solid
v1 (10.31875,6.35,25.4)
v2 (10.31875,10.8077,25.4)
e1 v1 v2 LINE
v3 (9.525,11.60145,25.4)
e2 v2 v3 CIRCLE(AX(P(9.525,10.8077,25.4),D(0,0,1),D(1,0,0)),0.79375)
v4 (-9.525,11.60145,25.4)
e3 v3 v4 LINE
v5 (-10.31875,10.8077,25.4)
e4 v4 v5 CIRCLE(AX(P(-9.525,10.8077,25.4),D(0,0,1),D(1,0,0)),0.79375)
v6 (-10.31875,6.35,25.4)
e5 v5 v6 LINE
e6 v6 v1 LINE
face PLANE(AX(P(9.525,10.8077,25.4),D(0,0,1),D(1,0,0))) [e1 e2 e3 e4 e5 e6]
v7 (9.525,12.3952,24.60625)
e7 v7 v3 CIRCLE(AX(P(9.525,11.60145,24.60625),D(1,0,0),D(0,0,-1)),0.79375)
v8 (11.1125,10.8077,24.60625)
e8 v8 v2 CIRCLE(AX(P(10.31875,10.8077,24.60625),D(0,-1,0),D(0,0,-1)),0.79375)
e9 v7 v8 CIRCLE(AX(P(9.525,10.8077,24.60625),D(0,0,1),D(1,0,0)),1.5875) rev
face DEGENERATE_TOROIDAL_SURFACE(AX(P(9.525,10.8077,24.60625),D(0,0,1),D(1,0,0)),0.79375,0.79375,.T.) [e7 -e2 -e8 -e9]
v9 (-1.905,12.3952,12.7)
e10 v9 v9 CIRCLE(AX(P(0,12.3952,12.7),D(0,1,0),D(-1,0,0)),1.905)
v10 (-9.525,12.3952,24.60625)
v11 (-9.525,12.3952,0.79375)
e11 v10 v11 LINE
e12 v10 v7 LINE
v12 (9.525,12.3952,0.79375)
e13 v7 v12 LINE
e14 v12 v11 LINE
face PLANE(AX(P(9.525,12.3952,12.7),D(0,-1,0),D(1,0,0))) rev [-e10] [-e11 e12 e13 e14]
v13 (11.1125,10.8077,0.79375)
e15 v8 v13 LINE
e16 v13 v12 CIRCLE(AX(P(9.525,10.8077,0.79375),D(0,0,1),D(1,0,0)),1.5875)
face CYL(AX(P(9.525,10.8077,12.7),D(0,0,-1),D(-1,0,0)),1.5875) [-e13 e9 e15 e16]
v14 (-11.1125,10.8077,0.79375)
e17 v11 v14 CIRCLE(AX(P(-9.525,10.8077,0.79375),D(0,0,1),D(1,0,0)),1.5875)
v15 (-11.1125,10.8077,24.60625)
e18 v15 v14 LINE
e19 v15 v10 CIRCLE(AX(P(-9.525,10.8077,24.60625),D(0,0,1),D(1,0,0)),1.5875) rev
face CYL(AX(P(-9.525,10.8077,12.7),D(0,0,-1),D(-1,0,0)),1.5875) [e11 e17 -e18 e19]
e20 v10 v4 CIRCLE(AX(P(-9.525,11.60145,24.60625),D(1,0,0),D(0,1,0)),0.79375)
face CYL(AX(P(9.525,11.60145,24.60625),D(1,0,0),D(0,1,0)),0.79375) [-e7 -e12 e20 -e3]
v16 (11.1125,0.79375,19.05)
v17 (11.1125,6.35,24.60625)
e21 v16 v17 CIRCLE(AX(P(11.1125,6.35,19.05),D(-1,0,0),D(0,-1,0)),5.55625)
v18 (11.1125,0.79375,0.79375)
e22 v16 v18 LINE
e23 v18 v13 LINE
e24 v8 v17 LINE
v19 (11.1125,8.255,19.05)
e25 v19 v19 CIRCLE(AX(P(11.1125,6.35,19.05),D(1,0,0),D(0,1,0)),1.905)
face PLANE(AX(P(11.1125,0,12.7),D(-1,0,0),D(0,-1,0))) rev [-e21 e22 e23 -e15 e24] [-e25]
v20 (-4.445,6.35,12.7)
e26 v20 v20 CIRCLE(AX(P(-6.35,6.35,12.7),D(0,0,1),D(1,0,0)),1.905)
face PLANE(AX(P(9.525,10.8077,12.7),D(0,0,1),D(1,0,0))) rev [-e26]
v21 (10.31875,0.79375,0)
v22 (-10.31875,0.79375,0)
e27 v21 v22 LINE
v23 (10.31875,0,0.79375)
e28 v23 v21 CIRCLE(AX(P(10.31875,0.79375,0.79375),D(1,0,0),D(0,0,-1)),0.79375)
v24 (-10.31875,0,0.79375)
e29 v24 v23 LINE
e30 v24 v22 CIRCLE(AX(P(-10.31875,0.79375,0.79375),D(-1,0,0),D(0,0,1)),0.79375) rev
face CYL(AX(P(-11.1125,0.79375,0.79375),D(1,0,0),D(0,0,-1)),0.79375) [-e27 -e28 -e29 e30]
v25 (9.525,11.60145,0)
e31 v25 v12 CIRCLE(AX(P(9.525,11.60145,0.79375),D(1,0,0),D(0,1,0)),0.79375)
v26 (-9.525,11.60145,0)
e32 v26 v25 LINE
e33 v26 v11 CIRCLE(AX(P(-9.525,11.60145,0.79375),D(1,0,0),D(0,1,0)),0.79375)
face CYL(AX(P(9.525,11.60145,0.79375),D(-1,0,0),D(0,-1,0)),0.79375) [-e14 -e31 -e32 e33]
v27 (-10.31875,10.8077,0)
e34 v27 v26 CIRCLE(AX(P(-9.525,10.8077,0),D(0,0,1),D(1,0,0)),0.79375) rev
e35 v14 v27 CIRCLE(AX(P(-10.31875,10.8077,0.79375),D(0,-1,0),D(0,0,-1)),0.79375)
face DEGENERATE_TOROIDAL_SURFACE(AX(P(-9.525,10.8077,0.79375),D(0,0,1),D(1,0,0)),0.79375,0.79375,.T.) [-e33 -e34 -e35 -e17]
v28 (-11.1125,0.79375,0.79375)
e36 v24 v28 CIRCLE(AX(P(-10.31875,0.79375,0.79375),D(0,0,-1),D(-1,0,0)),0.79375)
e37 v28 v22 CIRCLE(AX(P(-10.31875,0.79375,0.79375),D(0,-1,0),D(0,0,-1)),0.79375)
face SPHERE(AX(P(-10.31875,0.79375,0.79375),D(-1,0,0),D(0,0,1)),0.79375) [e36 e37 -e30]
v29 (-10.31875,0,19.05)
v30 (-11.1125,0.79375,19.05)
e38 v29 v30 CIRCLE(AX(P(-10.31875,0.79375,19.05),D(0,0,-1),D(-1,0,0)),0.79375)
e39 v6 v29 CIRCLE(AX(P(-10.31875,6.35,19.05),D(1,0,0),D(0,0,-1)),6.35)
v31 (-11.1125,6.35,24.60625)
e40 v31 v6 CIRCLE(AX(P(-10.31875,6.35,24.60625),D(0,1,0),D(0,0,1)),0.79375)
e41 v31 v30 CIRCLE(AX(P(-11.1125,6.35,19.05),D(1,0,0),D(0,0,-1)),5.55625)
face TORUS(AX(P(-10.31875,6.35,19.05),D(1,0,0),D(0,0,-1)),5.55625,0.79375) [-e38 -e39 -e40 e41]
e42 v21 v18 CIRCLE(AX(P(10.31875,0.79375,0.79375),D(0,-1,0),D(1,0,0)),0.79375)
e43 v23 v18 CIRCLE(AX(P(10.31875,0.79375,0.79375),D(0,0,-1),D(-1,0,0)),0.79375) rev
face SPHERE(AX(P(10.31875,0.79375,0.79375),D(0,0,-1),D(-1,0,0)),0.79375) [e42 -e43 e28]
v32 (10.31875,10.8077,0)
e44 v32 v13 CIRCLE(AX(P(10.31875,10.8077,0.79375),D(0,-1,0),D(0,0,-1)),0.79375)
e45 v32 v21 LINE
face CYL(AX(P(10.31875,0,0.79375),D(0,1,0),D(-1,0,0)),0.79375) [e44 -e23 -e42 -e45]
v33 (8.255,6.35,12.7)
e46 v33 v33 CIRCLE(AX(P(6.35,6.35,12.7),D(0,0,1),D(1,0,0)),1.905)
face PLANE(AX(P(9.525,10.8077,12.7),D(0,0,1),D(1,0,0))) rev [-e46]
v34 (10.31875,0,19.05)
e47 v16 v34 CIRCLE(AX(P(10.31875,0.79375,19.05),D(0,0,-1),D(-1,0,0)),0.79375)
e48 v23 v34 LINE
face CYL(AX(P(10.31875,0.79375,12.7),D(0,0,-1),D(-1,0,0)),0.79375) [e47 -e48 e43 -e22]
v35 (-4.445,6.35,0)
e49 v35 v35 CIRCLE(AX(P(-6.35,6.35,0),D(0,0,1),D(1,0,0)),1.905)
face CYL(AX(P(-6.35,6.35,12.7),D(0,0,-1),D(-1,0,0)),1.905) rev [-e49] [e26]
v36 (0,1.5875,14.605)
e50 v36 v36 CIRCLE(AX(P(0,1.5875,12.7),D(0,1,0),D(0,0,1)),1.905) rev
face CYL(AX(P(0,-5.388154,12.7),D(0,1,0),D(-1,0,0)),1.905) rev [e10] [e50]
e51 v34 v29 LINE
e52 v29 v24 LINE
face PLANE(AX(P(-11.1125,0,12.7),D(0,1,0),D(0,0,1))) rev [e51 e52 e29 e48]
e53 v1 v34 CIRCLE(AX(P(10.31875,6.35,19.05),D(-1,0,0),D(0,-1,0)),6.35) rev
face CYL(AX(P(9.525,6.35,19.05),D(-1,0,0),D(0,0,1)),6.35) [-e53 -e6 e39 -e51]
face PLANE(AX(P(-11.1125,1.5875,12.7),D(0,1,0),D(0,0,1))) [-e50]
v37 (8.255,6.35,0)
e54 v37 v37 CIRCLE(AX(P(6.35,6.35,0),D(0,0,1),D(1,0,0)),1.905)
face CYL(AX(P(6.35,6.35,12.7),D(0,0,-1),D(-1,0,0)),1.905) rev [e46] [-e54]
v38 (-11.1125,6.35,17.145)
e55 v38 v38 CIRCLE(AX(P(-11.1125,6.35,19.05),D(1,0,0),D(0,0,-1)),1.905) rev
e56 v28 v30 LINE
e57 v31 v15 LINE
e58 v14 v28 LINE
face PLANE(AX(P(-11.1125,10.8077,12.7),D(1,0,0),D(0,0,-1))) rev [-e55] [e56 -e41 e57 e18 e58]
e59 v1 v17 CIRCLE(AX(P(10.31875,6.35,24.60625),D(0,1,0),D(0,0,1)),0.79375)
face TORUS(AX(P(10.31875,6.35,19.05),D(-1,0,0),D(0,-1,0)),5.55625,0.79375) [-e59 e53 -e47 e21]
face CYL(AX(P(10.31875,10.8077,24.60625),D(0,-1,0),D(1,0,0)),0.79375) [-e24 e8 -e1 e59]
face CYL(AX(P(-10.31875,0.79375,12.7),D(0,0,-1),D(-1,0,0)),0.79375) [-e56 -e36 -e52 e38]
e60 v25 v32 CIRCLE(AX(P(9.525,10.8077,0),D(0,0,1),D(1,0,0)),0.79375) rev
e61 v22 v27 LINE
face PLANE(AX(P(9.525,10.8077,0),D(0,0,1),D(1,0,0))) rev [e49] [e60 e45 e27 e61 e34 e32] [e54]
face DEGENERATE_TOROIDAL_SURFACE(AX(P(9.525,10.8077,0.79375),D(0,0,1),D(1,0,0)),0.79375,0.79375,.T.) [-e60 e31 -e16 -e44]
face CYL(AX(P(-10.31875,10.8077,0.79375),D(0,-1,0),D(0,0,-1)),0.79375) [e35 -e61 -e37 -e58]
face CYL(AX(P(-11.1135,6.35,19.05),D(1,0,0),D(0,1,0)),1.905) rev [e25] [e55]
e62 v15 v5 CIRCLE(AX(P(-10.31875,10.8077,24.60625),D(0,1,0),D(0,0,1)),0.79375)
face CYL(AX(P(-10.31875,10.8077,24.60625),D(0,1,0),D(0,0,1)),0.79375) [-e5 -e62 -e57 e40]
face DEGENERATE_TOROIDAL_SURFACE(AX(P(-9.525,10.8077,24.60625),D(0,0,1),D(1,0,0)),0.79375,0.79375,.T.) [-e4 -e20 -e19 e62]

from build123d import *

# Parameters (mm, degrees)
SKETCH1_R           = 1.905
BOSS_EXTRUDE1_DEPTH = 12.7
BOSS_EXTRUDE2_DEPTH = 12.7
CUT_EXTRUDE1_REACH  = 37.955
SKETCH3_R           = 1.905
SKETCH4_R           = 1.905
CUT_EXTRUDE2_DEPTH  = 10.8077
FILLET1_R           = 0.79375
FILLET2_R           = 6.35


with BuildPart() as part:
    # Sketch1 → Boss-Extrude1 (new body)
    with BuildSketch(Plane.XY):
        with BuildLine():
            Line((-11.1125, 0), (11.1125, 0))
            Line((11.1125, 0), (11.1125, 10.8077))
            ThreePointArc((11.1125, 10.8077), (10.647532015, 11.930232015), (9.525, 12.3952))
            Line((9.525, 12.3952), (-9.525, 12.3952))
            ThreePointArc((-9.525, 12.3952), (-10.647532015, 11.930232015), (-11.1125, 10.8077))
            Line((-11.1125, 10.8077), (-11.1125, 0))
        make_face()
        with Locations((-6.35, 6.35)):
            Circle(SKETCH1_R, mode=Mode.SUBTRACT)
        with Locations((6.35, 6.35)):
            Circle(SKETCH1_R, mode=Mode.SUBTRACT)
    extrude(amount=BOSS_EXTRUDE1_DEPTH)

    # Sketch2 → Boss-Extrude2 (add)
    with BuildSketch(Plane.XY.offset(12.7)):
        with BuildLine():
            Line((11.1125, 0), (11.1125, 10.8077))
            ThreePointArc((11.1125, 10.8077), (10.647532015, 11.930232015), (9.525, 12.3952))
            Line((9.525, 12.3952), (-9.525, 12.3952))
            ThreePointArc((-9.525, 12.3952), (-10.647532015, 11.930232015), (-11.1125, 10.8077))
            Line((-11.1125, 10.8077), (-11.1125, 0))
            Line((-11.1125, 0), (11.1125, 0))
        make_face()
    extrude(amount=BOSS_EXTRUDE2_DEPTH)

    # Sketch3 → Cut-Extrude1 (cut, up to next)
    with BuildSketch(Plane(origin=(11.1125, 0, 0), x_dir=(0, 0, -1), z_dir=(1, 0, 0)), mode=Mode.PRIVATE) as cut_extrude1_sk1:
        with Locations(Location((-19.05, 6.35, 0), (0, 0, 90))):
            Circle(SKETCH3_R)
    cut_extrude1_tool1 = extrude(cut_extrude1_sk1.sketch, amount=-CUT_EXTRUDE1_REACH, mode=Mode.PRIVATE) & part.part
    add(cut_extrude1_tool1.solids().sort_by_distance((11.1125, 6.35, 19.05))[0], mode=Mode.SUBTRACT)

    # Sketch4 → Cut-Extrude2 (cut)
    with BuildSketch(Plane(origin=(0, 12.3952, 0), x_dir=(1, 0, 0), z_dir=(0, 1, 0))):
        with Locations(Location((0, -12.7, 0), (0, 0, 180))):
            Circle(SKETCH4_R)
    extrude(amount=-CUT_EXTRUDE2_DEPTH, mode=Mode.SUBTRACT)

    # Fillet1
    fillet1_edges = [part.edges().sort_by_distance(p)[0] for p in [
        (11.1125, 0, 12.7),
        (-11.1125, 0, 12.7),
        (11.1125, 5.40385, 25.4),
        (10.647532015, 11.930232015, 25.4),
        (0, 12.3952, 25.4),
        (-10.647532015, 11.930232015, 25.4),
        (-11.1125, 5.40385, 25.4),
        (0, 0, 0),
        (-11.1125, 5.40385, 0),
        (-10.647532015, 11.930232015, 0),
        (0, 12.3952, 0),
        (10.647532015, 11.930232015, 0),
        (11.1125, 5.40385, 0),
    ]]
    fillet(fillet1_edges, radius=FILLET1_R)

    # Fillet2
    # the kernel refuses this fillet: 6.35 mm, written as the material it takes off along each edge
    with BuildSketch(Plane(origin=(-11.1125, 6.35, 19.05), x_dir=(0, -1, 0), z_dir=(0, 0, -1))) as fillet2_piece_1:
        with BuildLine():
            CenterArc((5.55625, -0.79375), 0.79375, 0, 90)
            Line((6.35, -0.79375), (6.35, 0))
            Line((6.35, 0), (5.55625, 0))
        make_face()
    revolve(axis=Axis((-11.1125, 6.35, 19.05), (-1, 0, 0)), revolution_arc=90, mode=Mode.SUBTRACT)
    with BuildSketch(Plane(origin=(11.1125, 6.35, 19.05), x_dir=(0, 0, 1), z_dir=(0, 1, 0))) as fillet2_piece_2:
        with BuildLine():
            CenterArc((5.55625, -0.79375), 0.79375, 0, 90)
            Line((6.35, -0.79375), (6.35, 0))
            Line((6.35, 0), (5.55625, 0))
        make_face()
    revolve(axis=Axis((11.1125, 6.35, 19.05), (1, 0, 0)), revolution_arc=90, mode=Mode.SUBTRACT)
    with BuildSketch(Plane(origin=(-11.1125, 0, 25.4), x_dir=(0, 0, -1), z_dir=(1, 0, 0))) as fillet2_piece_3:
        with BuildLine():
            CenterArc((FILLET2_R, FILLET2_R), FILLET2_R, 180, 90)
            Line((0, FILLET2_R), (0, 0))
            Line((0, 0), (FILLET2_R, 0))
        make_face()
    extrude(amount=22.225, mode=Mode.SUBTRACT)


solid = part.part
